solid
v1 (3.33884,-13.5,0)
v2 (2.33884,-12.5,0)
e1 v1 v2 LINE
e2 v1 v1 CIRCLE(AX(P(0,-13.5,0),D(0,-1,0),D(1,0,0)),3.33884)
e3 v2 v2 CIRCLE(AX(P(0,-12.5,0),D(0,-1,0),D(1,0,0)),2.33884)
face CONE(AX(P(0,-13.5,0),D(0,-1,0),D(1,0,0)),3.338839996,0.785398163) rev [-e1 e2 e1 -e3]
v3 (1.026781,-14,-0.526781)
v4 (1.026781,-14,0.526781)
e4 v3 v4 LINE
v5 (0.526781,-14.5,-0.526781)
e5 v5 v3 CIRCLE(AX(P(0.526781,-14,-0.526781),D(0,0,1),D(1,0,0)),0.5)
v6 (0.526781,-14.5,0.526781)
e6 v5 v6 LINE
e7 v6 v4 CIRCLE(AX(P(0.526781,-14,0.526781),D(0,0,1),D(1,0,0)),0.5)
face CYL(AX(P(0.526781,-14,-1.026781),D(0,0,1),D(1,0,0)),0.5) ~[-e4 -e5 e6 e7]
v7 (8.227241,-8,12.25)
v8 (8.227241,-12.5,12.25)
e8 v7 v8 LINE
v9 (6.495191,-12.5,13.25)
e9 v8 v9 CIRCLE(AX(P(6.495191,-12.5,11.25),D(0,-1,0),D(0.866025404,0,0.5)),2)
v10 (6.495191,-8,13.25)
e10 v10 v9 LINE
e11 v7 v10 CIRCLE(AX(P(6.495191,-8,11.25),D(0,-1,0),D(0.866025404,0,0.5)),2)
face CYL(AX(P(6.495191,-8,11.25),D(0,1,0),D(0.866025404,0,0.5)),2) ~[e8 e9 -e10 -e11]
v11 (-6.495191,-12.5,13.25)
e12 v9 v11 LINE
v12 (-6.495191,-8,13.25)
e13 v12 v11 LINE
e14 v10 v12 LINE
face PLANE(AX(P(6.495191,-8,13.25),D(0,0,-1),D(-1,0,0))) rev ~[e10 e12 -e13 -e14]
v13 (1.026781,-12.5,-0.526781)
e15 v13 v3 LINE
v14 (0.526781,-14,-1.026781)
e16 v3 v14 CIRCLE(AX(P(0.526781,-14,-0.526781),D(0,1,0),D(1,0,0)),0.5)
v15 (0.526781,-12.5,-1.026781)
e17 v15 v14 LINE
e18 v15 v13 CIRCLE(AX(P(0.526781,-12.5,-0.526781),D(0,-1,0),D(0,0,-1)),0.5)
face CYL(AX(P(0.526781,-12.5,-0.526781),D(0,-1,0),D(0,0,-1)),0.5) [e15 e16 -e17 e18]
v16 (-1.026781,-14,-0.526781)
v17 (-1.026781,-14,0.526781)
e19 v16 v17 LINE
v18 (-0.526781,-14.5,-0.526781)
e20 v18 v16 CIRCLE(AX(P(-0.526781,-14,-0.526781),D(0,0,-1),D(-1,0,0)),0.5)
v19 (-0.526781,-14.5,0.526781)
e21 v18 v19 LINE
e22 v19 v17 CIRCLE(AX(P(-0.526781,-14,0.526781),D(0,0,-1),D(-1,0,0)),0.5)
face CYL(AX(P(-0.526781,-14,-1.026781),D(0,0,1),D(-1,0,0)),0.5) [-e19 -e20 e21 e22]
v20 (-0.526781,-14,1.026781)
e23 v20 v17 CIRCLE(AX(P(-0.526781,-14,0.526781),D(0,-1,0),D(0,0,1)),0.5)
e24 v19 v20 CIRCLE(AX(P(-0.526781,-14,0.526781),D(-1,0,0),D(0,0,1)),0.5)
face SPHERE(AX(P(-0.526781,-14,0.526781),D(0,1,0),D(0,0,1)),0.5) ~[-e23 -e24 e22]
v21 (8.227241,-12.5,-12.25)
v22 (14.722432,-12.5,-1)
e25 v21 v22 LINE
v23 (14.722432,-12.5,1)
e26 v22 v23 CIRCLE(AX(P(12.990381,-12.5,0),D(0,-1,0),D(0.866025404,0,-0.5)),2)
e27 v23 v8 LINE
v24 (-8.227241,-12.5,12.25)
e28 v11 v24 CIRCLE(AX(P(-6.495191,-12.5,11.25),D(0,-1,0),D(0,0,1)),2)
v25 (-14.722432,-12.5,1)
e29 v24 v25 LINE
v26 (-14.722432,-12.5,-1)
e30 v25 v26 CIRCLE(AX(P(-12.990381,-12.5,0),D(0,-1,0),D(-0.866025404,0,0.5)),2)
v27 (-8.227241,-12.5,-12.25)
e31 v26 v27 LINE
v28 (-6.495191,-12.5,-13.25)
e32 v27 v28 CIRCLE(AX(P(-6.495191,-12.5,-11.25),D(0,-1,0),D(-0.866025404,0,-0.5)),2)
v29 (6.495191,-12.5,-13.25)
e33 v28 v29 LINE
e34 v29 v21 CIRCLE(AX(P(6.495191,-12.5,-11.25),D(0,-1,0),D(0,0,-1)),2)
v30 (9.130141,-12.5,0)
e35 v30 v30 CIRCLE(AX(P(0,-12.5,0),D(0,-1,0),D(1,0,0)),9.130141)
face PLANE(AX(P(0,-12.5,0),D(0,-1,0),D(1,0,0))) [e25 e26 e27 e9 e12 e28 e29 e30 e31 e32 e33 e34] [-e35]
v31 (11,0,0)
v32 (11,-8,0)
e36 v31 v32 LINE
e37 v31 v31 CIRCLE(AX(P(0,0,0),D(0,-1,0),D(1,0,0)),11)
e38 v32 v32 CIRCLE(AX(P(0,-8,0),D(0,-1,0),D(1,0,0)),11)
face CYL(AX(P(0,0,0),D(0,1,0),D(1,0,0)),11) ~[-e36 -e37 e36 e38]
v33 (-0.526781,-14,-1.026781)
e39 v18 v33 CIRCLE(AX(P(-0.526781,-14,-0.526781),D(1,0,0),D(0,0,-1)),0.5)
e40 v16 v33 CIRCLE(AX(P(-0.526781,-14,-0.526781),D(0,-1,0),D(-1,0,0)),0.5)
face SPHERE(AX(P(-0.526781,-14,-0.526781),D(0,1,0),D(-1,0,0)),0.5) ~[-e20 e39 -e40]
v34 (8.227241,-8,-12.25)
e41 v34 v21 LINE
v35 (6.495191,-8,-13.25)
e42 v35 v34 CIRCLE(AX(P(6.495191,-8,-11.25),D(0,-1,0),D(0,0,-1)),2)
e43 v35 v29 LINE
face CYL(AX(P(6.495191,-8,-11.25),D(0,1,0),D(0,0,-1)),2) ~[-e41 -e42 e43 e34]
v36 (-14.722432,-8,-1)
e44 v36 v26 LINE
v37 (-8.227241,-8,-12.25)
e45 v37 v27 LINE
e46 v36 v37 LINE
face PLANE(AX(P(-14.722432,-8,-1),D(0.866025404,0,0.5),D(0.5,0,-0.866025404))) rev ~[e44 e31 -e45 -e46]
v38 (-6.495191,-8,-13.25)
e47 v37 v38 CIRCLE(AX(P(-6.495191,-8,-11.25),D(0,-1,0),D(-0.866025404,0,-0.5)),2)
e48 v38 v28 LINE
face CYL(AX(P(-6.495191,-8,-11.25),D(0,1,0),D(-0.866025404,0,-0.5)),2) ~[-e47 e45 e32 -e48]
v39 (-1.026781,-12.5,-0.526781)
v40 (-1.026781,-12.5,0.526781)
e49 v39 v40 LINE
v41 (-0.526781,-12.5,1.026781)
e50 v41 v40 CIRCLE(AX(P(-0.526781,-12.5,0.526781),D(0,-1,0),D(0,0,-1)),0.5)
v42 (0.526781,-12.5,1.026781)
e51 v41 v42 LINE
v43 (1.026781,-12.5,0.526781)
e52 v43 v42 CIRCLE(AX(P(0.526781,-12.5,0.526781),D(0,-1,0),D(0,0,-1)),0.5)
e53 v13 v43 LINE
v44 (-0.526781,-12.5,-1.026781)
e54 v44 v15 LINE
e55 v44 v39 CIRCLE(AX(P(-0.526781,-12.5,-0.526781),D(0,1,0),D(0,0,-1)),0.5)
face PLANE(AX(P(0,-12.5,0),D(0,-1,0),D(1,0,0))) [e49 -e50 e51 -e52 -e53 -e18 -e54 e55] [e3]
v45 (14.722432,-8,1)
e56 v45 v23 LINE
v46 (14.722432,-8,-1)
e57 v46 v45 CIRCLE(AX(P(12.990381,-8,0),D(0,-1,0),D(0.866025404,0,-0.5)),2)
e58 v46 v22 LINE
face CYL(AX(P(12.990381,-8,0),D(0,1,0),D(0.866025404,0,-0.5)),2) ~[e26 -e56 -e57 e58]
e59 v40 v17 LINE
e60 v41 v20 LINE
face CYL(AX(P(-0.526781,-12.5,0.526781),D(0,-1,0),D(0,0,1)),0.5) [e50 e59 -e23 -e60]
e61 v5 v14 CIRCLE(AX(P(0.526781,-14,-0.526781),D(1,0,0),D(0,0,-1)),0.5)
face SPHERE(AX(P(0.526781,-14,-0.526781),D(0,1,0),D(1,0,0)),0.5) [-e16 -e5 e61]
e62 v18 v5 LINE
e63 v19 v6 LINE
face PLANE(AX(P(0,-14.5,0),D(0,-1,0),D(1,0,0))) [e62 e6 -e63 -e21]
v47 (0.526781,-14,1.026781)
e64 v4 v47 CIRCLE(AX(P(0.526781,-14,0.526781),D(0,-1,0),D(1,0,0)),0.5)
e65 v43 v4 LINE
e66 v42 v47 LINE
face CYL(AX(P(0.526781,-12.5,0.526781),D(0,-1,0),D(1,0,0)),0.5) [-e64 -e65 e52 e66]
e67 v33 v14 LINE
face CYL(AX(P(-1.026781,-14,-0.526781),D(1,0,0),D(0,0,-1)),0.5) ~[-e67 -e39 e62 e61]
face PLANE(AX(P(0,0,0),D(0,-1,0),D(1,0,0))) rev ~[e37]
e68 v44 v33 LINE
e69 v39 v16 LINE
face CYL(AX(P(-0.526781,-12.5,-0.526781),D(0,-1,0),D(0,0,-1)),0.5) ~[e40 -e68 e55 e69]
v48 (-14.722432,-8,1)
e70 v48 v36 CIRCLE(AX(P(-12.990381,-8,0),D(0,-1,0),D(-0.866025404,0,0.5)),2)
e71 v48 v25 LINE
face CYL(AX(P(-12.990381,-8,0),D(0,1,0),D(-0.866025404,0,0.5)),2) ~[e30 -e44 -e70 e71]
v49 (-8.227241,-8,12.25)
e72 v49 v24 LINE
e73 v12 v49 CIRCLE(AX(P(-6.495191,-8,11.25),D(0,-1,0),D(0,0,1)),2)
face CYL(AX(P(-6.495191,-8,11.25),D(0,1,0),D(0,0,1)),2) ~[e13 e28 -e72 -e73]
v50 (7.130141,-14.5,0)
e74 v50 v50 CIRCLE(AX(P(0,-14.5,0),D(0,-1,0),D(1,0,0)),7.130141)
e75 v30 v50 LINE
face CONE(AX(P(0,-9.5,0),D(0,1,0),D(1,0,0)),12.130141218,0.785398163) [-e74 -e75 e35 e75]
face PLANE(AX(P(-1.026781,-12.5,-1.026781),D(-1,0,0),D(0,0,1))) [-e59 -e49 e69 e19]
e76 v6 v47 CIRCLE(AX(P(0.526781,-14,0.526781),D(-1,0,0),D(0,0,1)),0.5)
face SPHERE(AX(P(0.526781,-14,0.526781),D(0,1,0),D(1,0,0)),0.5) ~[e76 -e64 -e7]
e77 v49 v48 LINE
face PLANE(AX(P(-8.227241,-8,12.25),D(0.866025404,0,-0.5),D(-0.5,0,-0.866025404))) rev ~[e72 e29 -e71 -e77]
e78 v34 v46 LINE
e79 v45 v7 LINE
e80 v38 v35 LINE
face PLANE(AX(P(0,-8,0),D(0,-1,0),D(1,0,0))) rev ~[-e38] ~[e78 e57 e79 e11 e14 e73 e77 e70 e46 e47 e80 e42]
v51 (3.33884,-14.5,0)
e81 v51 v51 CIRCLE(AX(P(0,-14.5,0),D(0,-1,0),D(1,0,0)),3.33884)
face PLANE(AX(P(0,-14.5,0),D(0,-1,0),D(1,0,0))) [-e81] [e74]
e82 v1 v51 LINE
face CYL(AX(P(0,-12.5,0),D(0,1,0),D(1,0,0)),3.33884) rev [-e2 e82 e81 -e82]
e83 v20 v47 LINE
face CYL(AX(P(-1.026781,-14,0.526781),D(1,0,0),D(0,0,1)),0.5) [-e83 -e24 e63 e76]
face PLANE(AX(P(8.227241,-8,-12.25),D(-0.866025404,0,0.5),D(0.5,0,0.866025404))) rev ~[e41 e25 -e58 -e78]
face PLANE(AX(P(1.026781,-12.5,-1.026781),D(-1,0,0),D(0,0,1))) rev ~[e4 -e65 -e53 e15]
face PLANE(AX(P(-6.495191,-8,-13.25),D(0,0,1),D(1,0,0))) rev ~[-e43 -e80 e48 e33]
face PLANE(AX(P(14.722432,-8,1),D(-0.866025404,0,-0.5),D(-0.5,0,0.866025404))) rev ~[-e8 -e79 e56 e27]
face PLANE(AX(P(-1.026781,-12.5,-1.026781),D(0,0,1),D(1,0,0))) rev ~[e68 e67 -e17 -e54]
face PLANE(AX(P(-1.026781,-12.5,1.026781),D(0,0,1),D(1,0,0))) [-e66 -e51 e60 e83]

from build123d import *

# Parameters (mm, degrees)
F0_R     = 11
F1_DEPTH = 8
F3_DEPTH = 4.5
F4_R     = 12.1301412178
F4_R_2   = 3.338839996
F5_DEPTH = 2
F7_SIZE  = 1
F8_W     = 2.0535623771
F8_H     = 2.0535623771
F9_DEPTH = 2
F10_R    = 0.5


# Not quite as in the source:
# - a fillet or chamfer that OpenCascade refuses, or shapes differently, is made with other operations: its cross-section is extruded or revolved along the edge and cut away or added


with BuildPart() as f1:
    # F0 (on Front) → F1 (new body)
    with BuildSketch(Plane.XZ):
        Circle(F0_R)
    extrude(amount=F1_DEPTH)

    # F2 (on face) → F3 (join)
    with BuildSketch(Plane.XZ.offset(8)):
        with BuildLine():
            Line((6.4951905284, 13.25), (-6.4951905284, 13.25))
            ThreePointArc((-6.4951905284, 13.25), (-7.4951905284, 12.9820508076), (-8.227241336, 12.25))
            Line((-8.227241336, 12.25), (-14.7224318643, 1))
            ThreePointArc((-14.7224318643, 1), (-14.9903810568, 0), (-14.7224318643, -1))
            Line((-14.7224318643, -1), (-8.227241336, -12.25))
            ThreePointArc((-8.227241336, -12.25), (-7.4951905284, -12.9820508076), (-6.4951905284, -13.25))
            Line((-6.4951905284, -13.25), (6.4951905284, -13.25))
            ThreePointArc((6.4951905284, -13.25), (7.4951905284, -12.9820508076), (8.227241336, -12.25))
            Line((8.227241336, -12.25), (14.7224318643, -1))
            ThreePointArc((14.7224318643, -1), (14.9903810568, 0), (14.7224318643, 1))
            Line((14.7224318643, 1), (8.227241336, 12.25))
            ThreePointArc((8.227241336, 12.25), (7.4951905284, 12.9820508076), (6.4951905284, 13.25))
        make_face()
    extrude(amount=F3_DEPTH)

    # F4 (on face) → F5 (join)
    with BuildSketch(Plane.XZ.offset(12.5)):
        Circle(F4_R)
        Circle(F4_R_2, mode=Mode.SUBTRACT)
    extrude(amount=F5_DEPTH)

    # F6: chamfer of 5 on 1 edges, made by hand


with BuildPart() as f6_tool2:
    # F6_s3 → F6_t4 (revolve)
    with BuildSketch(Plane.XY):
        Polygon((12.1301412178, -9.5), (7.1301412178, -14.5), (12.1301412178, -14.5), align=None)
    revolve(axis=Axis((0, -14.5, 0), (0, -1, 0)))

    split(bisect_by=Plane.XZ.offset(12.5), keep=Keep.TOP)


with BuildPart() as f1_1:
    add(f1.part)

    # F6_t1: cut F6_tool2
    add(f6_tool2.part, mode=Mode.SUBTRACT)

    # F7
    f7_edges = [f1_1.edges().sort_by_distance(p)[0] for p in [
        (-3.33884, -12.5, 0),
    ]]
    chamfer(f7_edges, length=F7_SIZE)

    # F8 (on face) → F9 (join)
    with BuildSketch(Plane.XZ.offset(12.5)):
        Rectangle(F8_W, F8_H)
    extrude(amount=F9_DEPTH)

    # F10
    f10_edges = [f1_1.edges().sort_by_distance(p)[0] for p in [
        (1.026781, -13.5, -1.026781),
        (-1.026781, -13.5, -1.026781),
        (-1.026781, -13.5, 1.026781),
        (1.026781, -13.5, 1.026781),
        (1.026781, -14.5, 0),
        (0, -14.5, 1.026781),
        (-1.026781, -14.5, 0),
        (0, -14.5, -1.026781),
    ]]
    fillet(f10_edges, radius=F10_R)


solid = f1_1.part
